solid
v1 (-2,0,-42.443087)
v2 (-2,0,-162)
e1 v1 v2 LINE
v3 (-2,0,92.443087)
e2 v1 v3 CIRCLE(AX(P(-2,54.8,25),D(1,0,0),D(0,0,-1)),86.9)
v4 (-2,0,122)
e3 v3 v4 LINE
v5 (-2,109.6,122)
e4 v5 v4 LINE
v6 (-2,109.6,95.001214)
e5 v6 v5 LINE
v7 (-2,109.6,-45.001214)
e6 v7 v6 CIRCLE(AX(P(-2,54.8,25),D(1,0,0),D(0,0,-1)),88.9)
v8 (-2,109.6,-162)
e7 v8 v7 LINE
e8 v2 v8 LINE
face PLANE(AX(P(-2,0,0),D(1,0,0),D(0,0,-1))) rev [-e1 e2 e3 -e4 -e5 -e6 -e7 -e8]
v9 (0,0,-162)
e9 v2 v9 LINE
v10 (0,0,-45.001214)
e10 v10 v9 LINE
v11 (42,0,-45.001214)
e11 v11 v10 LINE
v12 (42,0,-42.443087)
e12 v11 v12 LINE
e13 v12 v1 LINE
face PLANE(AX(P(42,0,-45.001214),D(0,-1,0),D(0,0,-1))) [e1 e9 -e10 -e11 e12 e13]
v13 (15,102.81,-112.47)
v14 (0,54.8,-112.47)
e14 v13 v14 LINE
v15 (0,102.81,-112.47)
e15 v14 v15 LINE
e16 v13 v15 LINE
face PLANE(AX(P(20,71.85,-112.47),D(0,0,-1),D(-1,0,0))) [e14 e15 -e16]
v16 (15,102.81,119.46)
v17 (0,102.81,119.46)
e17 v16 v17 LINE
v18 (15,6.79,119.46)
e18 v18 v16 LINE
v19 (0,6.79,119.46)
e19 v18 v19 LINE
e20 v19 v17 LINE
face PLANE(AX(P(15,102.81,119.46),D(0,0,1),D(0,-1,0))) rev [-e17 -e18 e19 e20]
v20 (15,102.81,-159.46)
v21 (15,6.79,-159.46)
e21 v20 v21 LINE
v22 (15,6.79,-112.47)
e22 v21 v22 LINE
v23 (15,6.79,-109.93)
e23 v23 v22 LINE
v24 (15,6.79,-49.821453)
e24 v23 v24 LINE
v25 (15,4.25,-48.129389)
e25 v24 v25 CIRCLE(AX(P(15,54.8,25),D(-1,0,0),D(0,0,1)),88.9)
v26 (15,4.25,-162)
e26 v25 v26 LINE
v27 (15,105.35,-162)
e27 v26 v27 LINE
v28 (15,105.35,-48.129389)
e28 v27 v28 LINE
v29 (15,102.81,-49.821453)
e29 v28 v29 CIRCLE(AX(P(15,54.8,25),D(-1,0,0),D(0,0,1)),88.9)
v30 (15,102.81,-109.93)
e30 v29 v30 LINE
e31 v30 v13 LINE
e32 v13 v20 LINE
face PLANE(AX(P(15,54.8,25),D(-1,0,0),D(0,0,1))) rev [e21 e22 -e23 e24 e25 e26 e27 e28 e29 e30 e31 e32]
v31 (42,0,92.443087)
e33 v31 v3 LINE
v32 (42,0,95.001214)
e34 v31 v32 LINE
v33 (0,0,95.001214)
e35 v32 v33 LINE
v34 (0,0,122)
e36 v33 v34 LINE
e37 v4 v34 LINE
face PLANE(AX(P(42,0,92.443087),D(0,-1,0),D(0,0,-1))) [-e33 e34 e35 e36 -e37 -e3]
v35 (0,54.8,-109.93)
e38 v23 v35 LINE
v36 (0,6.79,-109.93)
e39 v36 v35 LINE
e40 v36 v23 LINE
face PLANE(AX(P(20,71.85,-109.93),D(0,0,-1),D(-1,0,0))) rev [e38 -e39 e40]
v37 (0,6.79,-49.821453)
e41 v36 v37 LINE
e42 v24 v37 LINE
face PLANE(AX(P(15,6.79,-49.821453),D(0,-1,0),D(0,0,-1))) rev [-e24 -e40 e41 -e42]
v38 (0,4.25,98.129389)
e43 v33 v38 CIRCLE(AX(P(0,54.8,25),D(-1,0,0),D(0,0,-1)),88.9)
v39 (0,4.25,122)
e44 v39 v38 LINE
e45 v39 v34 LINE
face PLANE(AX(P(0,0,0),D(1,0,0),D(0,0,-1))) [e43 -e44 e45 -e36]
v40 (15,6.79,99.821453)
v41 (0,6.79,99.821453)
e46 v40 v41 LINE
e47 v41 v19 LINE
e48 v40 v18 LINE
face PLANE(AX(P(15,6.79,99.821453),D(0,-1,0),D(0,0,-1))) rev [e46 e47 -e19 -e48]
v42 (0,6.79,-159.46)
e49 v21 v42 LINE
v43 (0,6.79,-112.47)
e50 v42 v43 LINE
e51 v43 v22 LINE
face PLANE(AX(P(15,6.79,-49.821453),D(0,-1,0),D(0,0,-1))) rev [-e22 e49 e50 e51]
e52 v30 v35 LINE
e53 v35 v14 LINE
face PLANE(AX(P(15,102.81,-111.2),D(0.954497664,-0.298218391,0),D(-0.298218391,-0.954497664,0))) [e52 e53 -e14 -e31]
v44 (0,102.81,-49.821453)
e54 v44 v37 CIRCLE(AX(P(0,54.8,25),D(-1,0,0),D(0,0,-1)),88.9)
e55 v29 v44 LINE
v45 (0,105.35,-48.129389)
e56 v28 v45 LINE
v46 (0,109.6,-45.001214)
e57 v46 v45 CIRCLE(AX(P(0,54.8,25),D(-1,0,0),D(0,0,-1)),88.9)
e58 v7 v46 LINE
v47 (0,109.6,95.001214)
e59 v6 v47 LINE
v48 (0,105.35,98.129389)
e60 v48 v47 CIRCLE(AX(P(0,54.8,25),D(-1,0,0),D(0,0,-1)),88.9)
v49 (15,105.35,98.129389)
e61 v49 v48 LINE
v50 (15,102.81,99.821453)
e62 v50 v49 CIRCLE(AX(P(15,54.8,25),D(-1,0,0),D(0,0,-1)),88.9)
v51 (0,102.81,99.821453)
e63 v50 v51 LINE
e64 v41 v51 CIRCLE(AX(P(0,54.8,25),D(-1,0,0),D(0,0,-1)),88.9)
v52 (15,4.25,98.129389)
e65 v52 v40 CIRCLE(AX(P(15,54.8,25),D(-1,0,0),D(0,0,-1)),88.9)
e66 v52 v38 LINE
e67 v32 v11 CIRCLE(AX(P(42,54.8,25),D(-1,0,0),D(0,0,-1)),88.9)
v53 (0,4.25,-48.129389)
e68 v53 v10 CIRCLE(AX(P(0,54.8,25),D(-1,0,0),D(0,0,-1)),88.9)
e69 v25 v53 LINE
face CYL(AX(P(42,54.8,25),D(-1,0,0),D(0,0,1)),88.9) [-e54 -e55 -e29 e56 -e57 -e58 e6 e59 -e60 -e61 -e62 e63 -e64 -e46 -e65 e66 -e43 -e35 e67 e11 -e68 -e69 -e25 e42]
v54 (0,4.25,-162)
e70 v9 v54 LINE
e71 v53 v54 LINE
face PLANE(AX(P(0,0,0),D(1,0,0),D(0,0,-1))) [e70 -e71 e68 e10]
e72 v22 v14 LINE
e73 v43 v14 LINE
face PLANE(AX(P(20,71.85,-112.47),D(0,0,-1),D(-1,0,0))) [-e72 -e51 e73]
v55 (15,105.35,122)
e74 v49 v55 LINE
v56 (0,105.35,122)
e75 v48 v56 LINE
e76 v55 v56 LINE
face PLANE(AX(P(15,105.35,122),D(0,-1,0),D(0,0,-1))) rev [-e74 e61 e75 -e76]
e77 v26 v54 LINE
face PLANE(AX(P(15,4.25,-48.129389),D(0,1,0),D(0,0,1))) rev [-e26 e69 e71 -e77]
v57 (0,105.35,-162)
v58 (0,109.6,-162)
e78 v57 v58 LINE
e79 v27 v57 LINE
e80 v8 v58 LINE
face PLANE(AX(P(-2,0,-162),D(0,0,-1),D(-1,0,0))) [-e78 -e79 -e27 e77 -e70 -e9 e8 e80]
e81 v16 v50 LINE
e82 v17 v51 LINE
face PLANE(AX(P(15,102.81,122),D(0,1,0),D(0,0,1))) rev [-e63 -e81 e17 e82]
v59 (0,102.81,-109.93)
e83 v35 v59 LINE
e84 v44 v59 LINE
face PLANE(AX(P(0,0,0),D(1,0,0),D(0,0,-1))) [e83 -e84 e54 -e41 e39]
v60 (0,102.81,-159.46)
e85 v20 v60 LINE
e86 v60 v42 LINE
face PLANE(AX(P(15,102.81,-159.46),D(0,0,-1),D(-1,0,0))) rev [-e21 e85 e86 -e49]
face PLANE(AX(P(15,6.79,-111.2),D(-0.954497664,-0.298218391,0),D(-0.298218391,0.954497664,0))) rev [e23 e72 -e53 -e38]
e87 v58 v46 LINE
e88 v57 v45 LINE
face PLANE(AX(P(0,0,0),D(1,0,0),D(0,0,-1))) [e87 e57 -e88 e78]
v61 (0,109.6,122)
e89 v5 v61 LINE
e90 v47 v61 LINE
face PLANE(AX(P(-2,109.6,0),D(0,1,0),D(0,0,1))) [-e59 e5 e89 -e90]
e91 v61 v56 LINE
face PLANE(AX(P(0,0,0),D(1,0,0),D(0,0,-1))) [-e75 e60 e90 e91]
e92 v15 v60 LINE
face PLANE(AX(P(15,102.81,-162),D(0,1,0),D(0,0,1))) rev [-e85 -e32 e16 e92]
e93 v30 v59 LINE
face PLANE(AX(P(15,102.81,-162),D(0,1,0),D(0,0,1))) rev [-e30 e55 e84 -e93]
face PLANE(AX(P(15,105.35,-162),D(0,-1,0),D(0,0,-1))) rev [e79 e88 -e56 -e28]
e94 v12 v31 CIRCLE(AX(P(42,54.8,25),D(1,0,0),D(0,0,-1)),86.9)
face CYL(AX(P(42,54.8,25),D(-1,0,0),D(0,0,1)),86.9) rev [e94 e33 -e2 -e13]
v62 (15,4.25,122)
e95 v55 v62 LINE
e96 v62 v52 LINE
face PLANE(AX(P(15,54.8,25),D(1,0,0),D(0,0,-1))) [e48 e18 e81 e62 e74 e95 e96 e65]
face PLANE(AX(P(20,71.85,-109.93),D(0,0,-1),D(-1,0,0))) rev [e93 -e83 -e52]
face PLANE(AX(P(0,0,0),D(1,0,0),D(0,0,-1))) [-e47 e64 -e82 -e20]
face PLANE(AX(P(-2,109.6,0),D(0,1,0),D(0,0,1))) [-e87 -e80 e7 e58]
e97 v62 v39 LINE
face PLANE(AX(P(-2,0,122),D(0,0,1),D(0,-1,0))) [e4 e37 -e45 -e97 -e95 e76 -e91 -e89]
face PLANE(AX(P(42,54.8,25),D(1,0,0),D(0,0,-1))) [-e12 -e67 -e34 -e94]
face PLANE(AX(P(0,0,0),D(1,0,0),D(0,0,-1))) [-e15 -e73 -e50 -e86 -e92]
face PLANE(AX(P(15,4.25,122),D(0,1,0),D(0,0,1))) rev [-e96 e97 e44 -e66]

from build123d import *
from build123d.topology import SkipClean

# Parameters (mm, degrees)
BOSS_EXTRUDE1_DEPTH = 42.000000074
BOSS_EXTRUDE2_START = 2.000000064
BOSS_EXTRUDE2_DEPTH = 2.000000064
BOSS_EXTRUDE3_DEPTH = 15
BOSS_EXTRUDE4_DEPTH = 15
BOSS_EXTRUDE5_DEPTH = 15
BOSS_EXTRUDE6_DEPTH = 15
RIB1_START          = -1.27
RIB1_DEPTH          = 2.54
RIB2_START          = -1.27
RIB2_DEPTH          = 2.54
SKETCH18_W          = 2.54
SKETCH18_H          = 96.020000238
BOSS_EXTRUDE7_DEPTH = 15
SKETCH19_W          = 2.54
SKETCH19_H          = 96.020000238
BOSS_EXTRUDE8_DEPTH = 15


# Read off the part's stored shape, not the designer's step: Rib1, Rib2
with BuildPart() as part:
    # Sketch1 → Boss-Extrude1 (new body)
    with BuildSketch(Plane.ZY):
        with BuildLine():
            Line((-45.001214275, 0), (-42.443087035, 0))
            ThreePointArc((-42.443087035, 0), (25, 141.699999936), (92.443087035, 0))
            Line((92.443087035, 0), (95.001214275, 0))
            ThreePointArc((95.001214275, 0), (25, 143.7), (-45.001214275, 0))
        make_face()
    extrude(amount=-BOSS_EXTRUDE1_DEPTH)

    # Sketch2 → Boss-Extrude2 (add)
    with SkipClean():  # the faces are left unmerged after this step: merging them gives an invalid solid
        with BuildSketch(Plane.ZY.offset(BOSS_EXTRUDE2_START)):
            with BuildLine():
                Line((-160, 0), (-45.001214275, 0))
                ThreePointArc((-45.001214275, 0), (-63.9, 54.800000001), (-45.001214274, 109.600000001))
                Line((-45.001214275, 109.600000002), (-160, 109.600000002))
                Line((-160, 109.600000002), (-162.000000064, 109.600000002))
                Line((-162.000000064, 109.600000002), (-162.000000064, 0))
                Line((-162.000000064, 0), (-160, 0))
            make_face()
            with BuildLine():
                ThreePointArc((-45.001214275, 0), (25, 143.7), (95.001214275, 0))
                Line((95.001214275, 0), (92.443087035, 0))
                ThreePointArc((92.443087035, 0), (25, 141.699999936), (-42.443087035, 0))
                Line((-42.443087035, 0), (-45.001214275, 0))
            make_face()
            with BuildLine():
                ThreePointArc((95.001214275, 109.6), (113.9, 54.8), (95.001214275, 0))
                Line((95.001214275, 0), (120, 0))
                Line((120, 0), (122.000000064, 0))
                Line((122.000000064, 0), (122.000000064, 109.6))
                Line((122.000000064, 109.6), (120, 109.6))
                Line((120, 109.6), (95.001214275, 109.6))
            make_face()
        extrude(amount=-BOSS_EXTRUDE2_DEPTH)

    # Sketch7 → Boss-Extrude3 (add)
    with SkipClean():  # the faces are left unmerged after this step: merging them gives an invalid solid
        with BuildSketch(Plane(origin=(0, 0, 0), x_dir=(0, 0, -1), z_dir=(1, 0, 0))):
            with BuildLine():
                Line((49.821453399, 6.789999882), (162.000000064, 6.789999882))
                Line((162.000000064, 6.789999882), (162.000000064, 4.249999882))
                Line((162.000000064, 4.249999882), (48.129388676, 4.249999882))
                ThreePointArc((48.129388676, 4.249999882), (48.986321828, 5.512738133), (49.821453399, 6.789999882))
            make_face()
        extrude(amount=BOSS_EXTRUDE3_DEPTH)

    # Sketch10 → Boss-Extrude4 (add)
    with SkipClean():  # the faces are left unmerged after this step: merging them gives an invalid solid
        with BuildSketch(Plane(origin=(0, 0, 0), x_dir=(0, 0, -1), z_dir=(1, 0, 0))):
            with BuildLine():
                Line((-99.821453399, 6.789999882), (-122.000000064, 6.789999882))
                Line((-122.000000064, 6.789999882), (-122.000000064, 4.249999882))
                Line((-122.000000064, 4.249999882), (-98.129388676, 4.249999882))
                ThreePointArc((-98.129388676, 4.249999882), (-98.986321828, 5.512738133), (-99.821453399, 6.789999882))
            make_face()
        extrude(amount=BOSS_EXTRUDE4_DEPTH)

    # Sketch12 → Boss-Extrude5 (add)
    with SkipClean():  # the faces are left unmerged after this step: merging them gives an invalid solid
        with BuildSketch(Plane(origin=(0, 0, 0), x_dir=(0, 0, -1), z_dir=(1, 0, 0))):
            with BuildLine():
                Line((-122.000000064, 105.35000012), (-98.129388674, 105.35000012))
                ThreePointArc((-98.129388674, 105.35000012), (-98.986321827, 104.087261869), (-99.821453397, 102.81000012))
                Line((-99.821453397, 102.81000012), (-122.000000064, 102.81000012))
                Line((-122.000000064, 102.81000012), (-122.000000064, 105.35000012))
            make_face()
        extrude(amount=BOSS_EXTRUDE5_DEPTH)

    # Sketch14 → Boss-Extrude6 (add)
    with SkipClean():  # the faces are left unmerged after this step: merging them gives an invalid solid
        with BuildSketch(Plane(origin=(0, 0, 0), x_dir=(0, 0, -1), z_dir=(1, 0, 0))):
            with BuildLine():
                Line((162.000000064, 105.35000012), (48.129388674, 105.35000012))
                ThreePointArc((48.129388674, 105.35000012), (48.986321827, 104.087261869), (49.821453397, 102.81000012))
                Line((49.821453397, 102.81000012), (162.000000064, 102.81000012))
                Line((162.000000064, 102.81000012), (162.000000064, 105.35000012))
            make_face()
        extrude(amount=BOSS_EXTRUDE6_DEPTH)

    # Rib1 outline → Rib1 (add)
    with SkipClean():  # the faces are left unmerged after this step: merging them gives an invalid solid
        with BuildSketch(Plane(origin=(0, 0, -111.200000064), x_dir=(-1, 0, 0), z_dir=(0, 0, -1)).offset(RIB1_START)):
            Polygon((0, 102.81000012), (-15, 102.81000012), (0, 54.800000001), align=None)
        extrude(amount=RIB1_DEPTH)

    # Rib2 outline → Rib2 (add)
    with SkipClean():  # the faces are left unmerged after this step: merging them gives an invalid solid
        with BuildSketch(Plane(origin=(0, 0, -111.200000064), x_dir=(-1, 0, 0), z_dir=(0, 0, -1)).offset(RIB2_START)):
            Polygon((0, 54.800000001), (-15, 6.789999882), (0, 6.789999882), align=None)
        extrude(amount=RIB2_DEPTH)

    # Sketch18 → Boss-Extrude7 (add)
    with SkipClean():  # the faces are left unmerged after this step: merging them gives an invalid solid
        with BuildSketch(Plane(origin=(0, 0, 0), x_dir=(0, 0, -1), z_dir=(1, 0, 0))):
            with Locations((160.730000064, 54.800000001)):
                Rectangle(SKETCH18_W, SKETCH18_H)
        extrude(amount=BOSS_EXTRUDE7_DEPTH)

    # Sketch19 → Boss-Extrude8 (add)
    with SkipClean():  # the faces are left unmerged after this step: merging them gives an invalid solid
        with BuildSketch(Plane(origin=(0, 0, 0), x_dir=(0, 0, -1), z_dir=(1, 0, 0))):
            with Locations((-120.730000064, 54.800000001)):
                Rectangle(SKETCH19_W, SKETCH19_H)
        extrude(amount=BOSS_EXTRUDE8_DEPTH)


solid = part.part
